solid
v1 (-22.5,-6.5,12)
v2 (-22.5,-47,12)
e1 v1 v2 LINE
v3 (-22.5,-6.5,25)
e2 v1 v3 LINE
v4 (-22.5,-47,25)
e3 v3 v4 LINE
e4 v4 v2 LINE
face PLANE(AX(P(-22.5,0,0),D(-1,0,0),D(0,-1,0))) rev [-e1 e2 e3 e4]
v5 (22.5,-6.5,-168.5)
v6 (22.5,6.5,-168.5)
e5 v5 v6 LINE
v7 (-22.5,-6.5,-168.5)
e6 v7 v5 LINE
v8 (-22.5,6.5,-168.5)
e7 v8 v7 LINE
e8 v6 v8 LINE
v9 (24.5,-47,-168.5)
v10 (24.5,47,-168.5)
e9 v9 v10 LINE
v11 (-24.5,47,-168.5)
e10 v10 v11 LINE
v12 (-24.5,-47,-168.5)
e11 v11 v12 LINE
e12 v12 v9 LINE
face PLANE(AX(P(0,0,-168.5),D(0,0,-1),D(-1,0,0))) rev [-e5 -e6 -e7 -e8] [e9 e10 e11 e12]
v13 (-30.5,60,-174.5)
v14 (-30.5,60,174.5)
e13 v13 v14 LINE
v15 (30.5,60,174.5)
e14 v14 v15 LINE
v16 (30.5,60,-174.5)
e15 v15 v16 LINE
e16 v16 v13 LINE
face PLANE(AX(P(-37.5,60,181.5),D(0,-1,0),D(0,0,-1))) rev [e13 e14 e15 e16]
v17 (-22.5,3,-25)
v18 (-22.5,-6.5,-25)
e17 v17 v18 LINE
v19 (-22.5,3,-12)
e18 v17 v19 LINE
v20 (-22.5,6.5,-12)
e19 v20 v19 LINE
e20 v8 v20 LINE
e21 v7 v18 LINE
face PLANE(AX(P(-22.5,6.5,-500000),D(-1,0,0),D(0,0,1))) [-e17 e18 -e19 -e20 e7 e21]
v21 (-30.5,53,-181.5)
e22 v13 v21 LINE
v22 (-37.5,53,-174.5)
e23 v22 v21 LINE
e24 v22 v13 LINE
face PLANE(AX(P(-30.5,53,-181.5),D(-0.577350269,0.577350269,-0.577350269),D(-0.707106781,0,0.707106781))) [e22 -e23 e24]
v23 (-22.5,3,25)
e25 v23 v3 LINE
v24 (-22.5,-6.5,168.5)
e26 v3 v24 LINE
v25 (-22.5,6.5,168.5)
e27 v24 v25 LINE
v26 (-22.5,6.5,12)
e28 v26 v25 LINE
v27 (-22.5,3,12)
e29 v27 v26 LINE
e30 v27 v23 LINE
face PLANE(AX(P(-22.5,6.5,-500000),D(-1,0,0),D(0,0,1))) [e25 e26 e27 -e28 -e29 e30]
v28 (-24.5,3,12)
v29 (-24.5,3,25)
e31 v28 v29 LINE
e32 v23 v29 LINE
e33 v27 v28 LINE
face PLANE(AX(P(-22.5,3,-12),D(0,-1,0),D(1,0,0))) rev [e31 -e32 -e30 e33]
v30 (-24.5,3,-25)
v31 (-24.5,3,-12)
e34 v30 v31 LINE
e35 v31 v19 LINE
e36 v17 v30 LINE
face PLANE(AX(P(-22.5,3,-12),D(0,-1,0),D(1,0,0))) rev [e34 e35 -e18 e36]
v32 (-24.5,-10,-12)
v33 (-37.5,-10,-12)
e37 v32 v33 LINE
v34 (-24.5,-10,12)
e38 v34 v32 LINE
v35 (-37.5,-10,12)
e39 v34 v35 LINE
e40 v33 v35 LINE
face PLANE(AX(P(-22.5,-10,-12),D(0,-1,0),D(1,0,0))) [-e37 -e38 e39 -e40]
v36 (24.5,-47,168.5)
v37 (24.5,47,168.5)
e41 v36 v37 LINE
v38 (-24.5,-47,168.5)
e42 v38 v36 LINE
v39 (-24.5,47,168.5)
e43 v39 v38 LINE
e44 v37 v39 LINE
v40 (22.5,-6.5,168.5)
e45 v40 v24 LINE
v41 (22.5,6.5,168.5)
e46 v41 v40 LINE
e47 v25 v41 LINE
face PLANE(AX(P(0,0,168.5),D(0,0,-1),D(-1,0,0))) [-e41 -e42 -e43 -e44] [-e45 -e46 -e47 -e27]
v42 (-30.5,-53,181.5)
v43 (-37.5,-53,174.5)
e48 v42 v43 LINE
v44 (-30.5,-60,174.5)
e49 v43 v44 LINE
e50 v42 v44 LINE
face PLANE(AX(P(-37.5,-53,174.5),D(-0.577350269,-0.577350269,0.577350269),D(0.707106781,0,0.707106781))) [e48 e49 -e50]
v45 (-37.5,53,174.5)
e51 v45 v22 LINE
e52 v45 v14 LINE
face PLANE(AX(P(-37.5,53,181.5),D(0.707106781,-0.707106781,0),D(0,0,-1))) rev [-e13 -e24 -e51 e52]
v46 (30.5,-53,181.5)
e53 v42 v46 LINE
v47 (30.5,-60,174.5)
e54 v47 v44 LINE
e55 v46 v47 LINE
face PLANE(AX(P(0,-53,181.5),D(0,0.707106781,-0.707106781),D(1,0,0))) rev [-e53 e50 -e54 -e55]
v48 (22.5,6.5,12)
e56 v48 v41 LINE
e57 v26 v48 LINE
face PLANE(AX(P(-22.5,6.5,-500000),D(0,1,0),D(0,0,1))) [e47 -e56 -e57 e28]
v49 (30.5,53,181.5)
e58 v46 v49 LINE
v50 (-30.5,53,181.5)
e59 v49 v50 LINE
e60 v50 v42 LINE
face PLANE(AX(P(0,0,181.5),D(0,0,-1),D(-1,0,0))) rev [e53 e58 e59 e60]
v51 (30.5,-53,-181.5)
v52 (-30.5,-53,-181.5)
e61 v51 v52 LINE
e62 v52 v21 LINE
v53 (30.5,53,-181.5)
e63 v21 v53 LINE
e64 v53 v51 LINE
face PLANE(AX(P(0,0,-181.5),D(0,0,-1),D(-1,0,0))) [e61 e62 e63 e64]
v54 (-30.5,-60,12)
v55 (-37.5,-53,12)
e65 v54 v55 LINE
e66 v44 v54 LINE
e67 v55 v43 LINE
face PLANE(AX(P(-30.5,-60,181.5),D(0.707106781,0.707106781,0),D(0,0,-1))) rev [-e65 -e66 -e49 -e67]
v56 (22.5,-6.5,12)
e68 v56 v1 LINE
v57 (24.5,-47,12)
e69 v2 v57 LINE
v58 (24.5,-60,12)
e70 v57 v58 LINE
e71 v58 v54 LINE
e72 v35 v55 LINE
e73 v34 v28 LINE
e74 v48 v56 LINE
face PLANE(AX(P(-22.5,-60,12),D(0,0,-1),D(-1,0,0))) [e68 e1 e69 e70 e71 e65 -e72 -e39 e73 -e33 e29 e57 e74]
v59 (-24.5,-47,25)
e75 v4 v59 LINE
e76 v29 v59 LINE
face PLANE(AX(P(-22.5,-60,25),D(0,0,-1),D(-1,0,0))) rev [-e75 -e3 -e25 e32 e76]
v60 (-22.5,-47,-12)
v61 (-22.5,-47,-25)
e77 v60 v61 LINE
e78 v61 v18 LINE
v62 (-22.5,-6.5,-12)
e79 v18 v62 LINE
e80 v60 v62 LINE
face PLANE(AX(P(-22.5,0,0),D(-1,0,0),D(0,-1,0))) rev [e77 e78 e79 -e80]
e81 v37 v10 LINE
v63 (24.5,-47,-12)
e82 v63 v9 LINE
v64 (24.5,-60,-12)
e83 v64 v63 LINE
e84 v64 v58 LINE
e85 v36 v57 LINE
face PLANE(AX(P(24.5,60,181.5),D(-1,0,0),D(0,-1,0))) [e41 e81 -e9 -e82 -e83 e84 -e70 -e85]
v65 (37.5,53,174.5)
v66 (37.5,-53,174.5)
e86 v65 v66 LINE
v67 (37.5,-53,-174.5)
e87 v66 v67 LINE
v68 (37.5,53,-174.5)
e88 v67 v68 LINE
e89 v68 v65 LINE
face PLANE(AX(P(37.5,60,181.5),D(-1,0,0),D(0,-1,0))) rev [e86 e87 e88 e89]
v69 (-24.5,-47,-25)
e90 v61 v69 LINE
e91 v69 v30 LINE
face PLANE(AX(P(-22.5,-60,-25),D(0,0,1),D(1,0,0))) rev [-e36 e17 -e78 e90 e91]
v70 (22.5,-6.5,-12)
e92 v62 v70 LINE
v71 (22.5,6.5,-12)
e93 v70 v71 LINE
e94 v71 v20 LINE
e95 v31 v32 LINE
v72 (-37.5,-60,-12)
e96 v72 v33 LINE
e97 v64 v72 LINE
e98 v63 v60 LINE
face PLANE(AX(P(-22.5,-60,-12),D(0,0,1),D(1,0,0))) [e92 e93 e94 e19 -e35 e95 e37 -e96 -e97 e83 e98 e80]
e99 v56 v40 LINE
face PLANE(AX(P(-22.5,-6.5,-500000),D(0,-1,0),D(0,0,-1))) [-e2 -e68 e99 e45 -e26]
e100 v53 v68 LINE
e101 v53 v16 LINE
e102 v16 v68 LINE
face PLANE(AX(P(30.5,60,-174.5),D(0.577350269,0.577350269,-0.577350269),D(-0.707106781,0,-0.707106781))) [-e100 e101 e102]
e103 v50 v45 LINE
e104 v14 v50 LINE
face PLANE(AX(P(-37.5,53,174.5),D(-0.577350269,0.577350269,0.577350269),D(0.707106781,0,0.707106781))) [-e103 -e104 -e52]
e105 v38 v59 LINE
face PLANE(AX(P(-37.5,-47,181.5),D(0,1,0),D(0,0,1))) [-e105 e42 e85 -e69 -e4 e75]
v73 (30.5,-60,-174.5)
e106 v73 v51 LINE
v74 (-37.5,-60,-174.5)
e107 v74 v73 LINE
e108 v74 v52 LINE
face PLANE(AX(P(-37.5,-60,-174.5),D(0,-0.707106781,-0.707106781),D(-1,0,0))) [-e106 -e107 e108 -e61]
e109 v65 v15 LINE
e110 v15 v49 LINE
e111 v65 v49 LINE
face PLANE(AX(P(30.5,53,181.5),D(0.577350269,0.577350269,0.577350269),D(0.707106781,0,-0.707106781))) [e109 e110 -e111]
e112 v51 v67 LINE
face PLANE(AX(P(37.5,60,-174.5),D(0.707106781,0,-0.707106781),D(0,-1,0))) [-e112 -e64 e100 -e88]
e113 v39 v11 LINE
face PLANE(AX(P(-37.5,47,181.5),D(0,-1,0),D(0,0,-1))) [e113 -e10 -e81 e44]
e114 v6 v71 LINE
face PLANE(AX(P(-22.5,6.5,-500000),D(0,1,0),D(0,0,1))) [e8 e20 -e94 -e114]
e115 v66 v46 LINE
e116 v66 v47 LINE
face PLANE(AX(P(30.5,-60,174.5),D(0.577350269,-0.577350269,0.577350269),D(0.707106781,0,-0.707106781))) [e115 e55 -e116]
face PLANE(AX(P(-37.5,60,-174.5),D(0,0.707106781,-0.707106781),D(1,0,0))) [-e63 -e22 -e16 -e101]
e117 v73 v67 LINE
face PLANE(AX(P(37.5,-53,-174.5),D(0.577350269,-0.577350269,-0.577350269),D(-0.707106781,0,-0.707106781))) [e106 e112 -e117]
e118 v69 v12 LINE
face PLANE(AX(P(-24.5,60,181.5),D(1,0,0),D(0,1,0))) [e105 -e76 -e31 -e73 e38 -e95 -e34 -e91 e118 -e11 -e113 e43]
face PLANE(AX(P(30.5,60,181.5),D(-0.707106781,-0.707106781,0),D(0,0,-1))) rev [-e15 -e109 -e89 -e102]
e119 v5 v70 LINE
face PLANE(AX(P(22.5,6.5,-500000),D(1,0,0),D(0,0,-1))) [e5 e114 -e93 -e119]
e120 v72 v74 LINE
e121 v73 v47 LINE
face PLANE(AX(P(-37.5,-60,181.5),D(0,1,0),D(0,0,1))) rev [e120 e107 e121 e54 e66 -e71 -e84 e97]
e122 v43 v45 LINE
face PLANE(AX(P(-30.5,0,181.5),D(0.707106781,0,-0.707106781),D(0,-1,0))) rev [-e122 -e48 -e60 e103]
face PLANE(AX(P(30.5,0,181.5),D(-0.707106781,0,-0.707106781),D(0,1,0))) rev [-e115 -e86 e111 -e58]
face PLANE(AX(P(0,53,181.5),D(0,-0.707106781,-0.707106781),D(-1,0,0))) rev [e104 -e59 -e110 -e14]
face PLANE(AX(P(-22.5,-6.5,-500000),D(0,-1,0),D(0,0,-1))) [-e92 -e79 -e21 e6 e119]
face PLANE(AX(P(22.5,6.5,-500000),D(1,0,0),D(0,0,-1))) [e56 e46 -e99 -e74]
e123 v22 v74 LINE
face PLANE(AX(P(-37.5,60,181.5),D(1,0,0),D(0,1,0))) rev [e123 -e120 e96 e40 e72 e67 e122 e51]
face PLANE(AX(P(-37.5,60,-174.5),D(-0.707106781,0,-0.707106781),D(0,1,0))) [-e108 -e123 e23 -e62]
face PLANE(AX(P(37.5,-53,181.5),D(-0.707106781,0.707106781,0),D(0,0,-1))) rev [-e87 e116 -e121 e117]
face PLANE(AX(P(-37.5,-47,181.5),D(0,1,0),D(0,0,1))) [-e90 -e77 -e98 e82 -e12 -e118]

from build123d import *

# Parameters (mm, degrees)
SKETCH1_W                       = 75
SKETCH1_H                       = 120
BOSS_EXTRUDE1_DEPTH             = 181.5
SKETCH2_W                       = 24
SKETCH2_H                       = 50
CUT_EXTRUDE1_DEPTH              = 15
SHELL1_START                    = -22.5
SHELL1_OUTLINE_W                = 94
SHELL1_OUTLINE_H                = 337
SHELL1_DEPTH                    = 47
SHELL1_START_2                  = -24.5
SHELL1_2_DEPTH                  = 2
BOSS_EXTRUDE2_REACH             = 196.804
SKETCH3_W                       = 45
SKETCH3_H                       = 13
BOSS_EXTRUDE2_DIRECTION_2_REACH = 196.804
CHAMFER1_SIZE                   = 7
CUT_EXTRUDE2_START              = -62
SKETCH4_W                       = 24
SKETCH4_H                       = 104.028076608
CUT_EXTRUDE2_DEPTH              = 49


# Read off the part's stored shape, not the designer's step: Shell1
with BuildPart() as part:
    # Sketch1 → Boss-Extrude1 (new, symmetric)
    with BuildSketch(Plane.XY):
        Rectangle(SKETCH1_W, SKETCH1_H)
    extrude(amount=BOSS_EXTRUDE1_DEPTH, both=True)

    # Sketch2 → Cut-Extrude1 (cut)
    with BuildSketch(Plane(origin=(-37.5, 0, 131.5), x_dir=(0, 0, -1), z_dir=(1, 0, 0))):
        with Locations((131.5, -35)):
            Rectangle(SKETCH2_W, SKETCH2_H)
    extrude(amount=CUT_EXTRUDE1_DEPTH, mode=Mode.SUBTRACT)

    # Shell1 outline → Shell1 (cut)
    with BuildSketch(Plane.YZ.offset(SHELL1_START)):
        Rectangle(SHELL1_OUTLINE_W, SHELL1_OUTLINE_H)
    extrude(amount=SHELL1_DEPTH, mode=Mode.SUBTRACT)

    # Shell1 2 outline → Shell1 2 (cut)
    with BuildSketch(Plane.YZ.offset(SHELL1_START_2)):
        Polygon((-47, -25), (-47, -168.5), (47, -168.5), (47, 168.5), (-47, 168.5), (-47, 25), (3, 25), (3, -25), align=None)
    extrude(amount=SHELL1_2_DEPTH, mode=Mode.SUBTRACT)

    # Sketch3 → Boss-Extrude2 (add, up to next)
    with BuildSketch(Plane.XY, mode=Mode.PRIVATE) as boss_extrude2_sk1:
        Rectangle(SKETCH3_W, SKETCH3_H)
    boss_extrude2_tool1 = extrude(boss_extrude2_sk1.sketch, amount=-BOSS_EXTRUDE2_REACH, mode=Mode.PRIVATE) - part.part
    add(boss_extrude2_tool1.solids().sort_by_distance((0, 0, 0))[0])

    # Sketch3 → Boss-Extrude2 direction 2 (add, up to next)
    with BuildSketch(Plane.XY, mode=Mode.PRIVATE) as boss_extrude2_direction_2_sk1:
        Rectangle(SKETCH3_W, SKETCH3_H)
    boss_extrude2_direction_2_tool1 = extrude(boss_extrude2_direction_2_sk1.sketch, amount=BOSS_EXTRUDE2_DIRECTION_2_REACH, mode=Mode.PRIVATE) - part.part
    add(boss_extrude2_direction_2_tool1.solids().sort_by_distance((0, 0, 0))[0])

    # Chamfer1
    chamfer1_edges = [part.edges().sort_by_distance(p)[0] for p in [
        (0, -60, 181.5),
        (37.5, 0, 181.5),
        (0, 60, 181.5),
        (37.5, 0, -181.5),
        (0, -60, -181.5),
        (-37.5, 0, -181.5),
        (0, 60, -181.5),
        (-37.5, 0, 181.5),
        (37.5, 60, 0),
        (37.5, -60, 0),
        (-37.5, -60, 96.75),
        (-37.5, 60, 0),
    ]]
    chamfer(chamfer1_edges, length=CHAMFER1_SIZE)

    # Sketch4 → Cut-Extrude2 (cut)
    with BuildSketch(Plane.ZY.offset(37.5).offset(CUT_EXTRUDE2_START)):
        with Locations((0, -20.489530189)):
            Rectangle(SKETCH4_W, SKETCH4_H)
    extrude(amount=CUT_EXTRUDE2_DEPTH, mode=Mode.SUBTRACT)


solid = part.part
